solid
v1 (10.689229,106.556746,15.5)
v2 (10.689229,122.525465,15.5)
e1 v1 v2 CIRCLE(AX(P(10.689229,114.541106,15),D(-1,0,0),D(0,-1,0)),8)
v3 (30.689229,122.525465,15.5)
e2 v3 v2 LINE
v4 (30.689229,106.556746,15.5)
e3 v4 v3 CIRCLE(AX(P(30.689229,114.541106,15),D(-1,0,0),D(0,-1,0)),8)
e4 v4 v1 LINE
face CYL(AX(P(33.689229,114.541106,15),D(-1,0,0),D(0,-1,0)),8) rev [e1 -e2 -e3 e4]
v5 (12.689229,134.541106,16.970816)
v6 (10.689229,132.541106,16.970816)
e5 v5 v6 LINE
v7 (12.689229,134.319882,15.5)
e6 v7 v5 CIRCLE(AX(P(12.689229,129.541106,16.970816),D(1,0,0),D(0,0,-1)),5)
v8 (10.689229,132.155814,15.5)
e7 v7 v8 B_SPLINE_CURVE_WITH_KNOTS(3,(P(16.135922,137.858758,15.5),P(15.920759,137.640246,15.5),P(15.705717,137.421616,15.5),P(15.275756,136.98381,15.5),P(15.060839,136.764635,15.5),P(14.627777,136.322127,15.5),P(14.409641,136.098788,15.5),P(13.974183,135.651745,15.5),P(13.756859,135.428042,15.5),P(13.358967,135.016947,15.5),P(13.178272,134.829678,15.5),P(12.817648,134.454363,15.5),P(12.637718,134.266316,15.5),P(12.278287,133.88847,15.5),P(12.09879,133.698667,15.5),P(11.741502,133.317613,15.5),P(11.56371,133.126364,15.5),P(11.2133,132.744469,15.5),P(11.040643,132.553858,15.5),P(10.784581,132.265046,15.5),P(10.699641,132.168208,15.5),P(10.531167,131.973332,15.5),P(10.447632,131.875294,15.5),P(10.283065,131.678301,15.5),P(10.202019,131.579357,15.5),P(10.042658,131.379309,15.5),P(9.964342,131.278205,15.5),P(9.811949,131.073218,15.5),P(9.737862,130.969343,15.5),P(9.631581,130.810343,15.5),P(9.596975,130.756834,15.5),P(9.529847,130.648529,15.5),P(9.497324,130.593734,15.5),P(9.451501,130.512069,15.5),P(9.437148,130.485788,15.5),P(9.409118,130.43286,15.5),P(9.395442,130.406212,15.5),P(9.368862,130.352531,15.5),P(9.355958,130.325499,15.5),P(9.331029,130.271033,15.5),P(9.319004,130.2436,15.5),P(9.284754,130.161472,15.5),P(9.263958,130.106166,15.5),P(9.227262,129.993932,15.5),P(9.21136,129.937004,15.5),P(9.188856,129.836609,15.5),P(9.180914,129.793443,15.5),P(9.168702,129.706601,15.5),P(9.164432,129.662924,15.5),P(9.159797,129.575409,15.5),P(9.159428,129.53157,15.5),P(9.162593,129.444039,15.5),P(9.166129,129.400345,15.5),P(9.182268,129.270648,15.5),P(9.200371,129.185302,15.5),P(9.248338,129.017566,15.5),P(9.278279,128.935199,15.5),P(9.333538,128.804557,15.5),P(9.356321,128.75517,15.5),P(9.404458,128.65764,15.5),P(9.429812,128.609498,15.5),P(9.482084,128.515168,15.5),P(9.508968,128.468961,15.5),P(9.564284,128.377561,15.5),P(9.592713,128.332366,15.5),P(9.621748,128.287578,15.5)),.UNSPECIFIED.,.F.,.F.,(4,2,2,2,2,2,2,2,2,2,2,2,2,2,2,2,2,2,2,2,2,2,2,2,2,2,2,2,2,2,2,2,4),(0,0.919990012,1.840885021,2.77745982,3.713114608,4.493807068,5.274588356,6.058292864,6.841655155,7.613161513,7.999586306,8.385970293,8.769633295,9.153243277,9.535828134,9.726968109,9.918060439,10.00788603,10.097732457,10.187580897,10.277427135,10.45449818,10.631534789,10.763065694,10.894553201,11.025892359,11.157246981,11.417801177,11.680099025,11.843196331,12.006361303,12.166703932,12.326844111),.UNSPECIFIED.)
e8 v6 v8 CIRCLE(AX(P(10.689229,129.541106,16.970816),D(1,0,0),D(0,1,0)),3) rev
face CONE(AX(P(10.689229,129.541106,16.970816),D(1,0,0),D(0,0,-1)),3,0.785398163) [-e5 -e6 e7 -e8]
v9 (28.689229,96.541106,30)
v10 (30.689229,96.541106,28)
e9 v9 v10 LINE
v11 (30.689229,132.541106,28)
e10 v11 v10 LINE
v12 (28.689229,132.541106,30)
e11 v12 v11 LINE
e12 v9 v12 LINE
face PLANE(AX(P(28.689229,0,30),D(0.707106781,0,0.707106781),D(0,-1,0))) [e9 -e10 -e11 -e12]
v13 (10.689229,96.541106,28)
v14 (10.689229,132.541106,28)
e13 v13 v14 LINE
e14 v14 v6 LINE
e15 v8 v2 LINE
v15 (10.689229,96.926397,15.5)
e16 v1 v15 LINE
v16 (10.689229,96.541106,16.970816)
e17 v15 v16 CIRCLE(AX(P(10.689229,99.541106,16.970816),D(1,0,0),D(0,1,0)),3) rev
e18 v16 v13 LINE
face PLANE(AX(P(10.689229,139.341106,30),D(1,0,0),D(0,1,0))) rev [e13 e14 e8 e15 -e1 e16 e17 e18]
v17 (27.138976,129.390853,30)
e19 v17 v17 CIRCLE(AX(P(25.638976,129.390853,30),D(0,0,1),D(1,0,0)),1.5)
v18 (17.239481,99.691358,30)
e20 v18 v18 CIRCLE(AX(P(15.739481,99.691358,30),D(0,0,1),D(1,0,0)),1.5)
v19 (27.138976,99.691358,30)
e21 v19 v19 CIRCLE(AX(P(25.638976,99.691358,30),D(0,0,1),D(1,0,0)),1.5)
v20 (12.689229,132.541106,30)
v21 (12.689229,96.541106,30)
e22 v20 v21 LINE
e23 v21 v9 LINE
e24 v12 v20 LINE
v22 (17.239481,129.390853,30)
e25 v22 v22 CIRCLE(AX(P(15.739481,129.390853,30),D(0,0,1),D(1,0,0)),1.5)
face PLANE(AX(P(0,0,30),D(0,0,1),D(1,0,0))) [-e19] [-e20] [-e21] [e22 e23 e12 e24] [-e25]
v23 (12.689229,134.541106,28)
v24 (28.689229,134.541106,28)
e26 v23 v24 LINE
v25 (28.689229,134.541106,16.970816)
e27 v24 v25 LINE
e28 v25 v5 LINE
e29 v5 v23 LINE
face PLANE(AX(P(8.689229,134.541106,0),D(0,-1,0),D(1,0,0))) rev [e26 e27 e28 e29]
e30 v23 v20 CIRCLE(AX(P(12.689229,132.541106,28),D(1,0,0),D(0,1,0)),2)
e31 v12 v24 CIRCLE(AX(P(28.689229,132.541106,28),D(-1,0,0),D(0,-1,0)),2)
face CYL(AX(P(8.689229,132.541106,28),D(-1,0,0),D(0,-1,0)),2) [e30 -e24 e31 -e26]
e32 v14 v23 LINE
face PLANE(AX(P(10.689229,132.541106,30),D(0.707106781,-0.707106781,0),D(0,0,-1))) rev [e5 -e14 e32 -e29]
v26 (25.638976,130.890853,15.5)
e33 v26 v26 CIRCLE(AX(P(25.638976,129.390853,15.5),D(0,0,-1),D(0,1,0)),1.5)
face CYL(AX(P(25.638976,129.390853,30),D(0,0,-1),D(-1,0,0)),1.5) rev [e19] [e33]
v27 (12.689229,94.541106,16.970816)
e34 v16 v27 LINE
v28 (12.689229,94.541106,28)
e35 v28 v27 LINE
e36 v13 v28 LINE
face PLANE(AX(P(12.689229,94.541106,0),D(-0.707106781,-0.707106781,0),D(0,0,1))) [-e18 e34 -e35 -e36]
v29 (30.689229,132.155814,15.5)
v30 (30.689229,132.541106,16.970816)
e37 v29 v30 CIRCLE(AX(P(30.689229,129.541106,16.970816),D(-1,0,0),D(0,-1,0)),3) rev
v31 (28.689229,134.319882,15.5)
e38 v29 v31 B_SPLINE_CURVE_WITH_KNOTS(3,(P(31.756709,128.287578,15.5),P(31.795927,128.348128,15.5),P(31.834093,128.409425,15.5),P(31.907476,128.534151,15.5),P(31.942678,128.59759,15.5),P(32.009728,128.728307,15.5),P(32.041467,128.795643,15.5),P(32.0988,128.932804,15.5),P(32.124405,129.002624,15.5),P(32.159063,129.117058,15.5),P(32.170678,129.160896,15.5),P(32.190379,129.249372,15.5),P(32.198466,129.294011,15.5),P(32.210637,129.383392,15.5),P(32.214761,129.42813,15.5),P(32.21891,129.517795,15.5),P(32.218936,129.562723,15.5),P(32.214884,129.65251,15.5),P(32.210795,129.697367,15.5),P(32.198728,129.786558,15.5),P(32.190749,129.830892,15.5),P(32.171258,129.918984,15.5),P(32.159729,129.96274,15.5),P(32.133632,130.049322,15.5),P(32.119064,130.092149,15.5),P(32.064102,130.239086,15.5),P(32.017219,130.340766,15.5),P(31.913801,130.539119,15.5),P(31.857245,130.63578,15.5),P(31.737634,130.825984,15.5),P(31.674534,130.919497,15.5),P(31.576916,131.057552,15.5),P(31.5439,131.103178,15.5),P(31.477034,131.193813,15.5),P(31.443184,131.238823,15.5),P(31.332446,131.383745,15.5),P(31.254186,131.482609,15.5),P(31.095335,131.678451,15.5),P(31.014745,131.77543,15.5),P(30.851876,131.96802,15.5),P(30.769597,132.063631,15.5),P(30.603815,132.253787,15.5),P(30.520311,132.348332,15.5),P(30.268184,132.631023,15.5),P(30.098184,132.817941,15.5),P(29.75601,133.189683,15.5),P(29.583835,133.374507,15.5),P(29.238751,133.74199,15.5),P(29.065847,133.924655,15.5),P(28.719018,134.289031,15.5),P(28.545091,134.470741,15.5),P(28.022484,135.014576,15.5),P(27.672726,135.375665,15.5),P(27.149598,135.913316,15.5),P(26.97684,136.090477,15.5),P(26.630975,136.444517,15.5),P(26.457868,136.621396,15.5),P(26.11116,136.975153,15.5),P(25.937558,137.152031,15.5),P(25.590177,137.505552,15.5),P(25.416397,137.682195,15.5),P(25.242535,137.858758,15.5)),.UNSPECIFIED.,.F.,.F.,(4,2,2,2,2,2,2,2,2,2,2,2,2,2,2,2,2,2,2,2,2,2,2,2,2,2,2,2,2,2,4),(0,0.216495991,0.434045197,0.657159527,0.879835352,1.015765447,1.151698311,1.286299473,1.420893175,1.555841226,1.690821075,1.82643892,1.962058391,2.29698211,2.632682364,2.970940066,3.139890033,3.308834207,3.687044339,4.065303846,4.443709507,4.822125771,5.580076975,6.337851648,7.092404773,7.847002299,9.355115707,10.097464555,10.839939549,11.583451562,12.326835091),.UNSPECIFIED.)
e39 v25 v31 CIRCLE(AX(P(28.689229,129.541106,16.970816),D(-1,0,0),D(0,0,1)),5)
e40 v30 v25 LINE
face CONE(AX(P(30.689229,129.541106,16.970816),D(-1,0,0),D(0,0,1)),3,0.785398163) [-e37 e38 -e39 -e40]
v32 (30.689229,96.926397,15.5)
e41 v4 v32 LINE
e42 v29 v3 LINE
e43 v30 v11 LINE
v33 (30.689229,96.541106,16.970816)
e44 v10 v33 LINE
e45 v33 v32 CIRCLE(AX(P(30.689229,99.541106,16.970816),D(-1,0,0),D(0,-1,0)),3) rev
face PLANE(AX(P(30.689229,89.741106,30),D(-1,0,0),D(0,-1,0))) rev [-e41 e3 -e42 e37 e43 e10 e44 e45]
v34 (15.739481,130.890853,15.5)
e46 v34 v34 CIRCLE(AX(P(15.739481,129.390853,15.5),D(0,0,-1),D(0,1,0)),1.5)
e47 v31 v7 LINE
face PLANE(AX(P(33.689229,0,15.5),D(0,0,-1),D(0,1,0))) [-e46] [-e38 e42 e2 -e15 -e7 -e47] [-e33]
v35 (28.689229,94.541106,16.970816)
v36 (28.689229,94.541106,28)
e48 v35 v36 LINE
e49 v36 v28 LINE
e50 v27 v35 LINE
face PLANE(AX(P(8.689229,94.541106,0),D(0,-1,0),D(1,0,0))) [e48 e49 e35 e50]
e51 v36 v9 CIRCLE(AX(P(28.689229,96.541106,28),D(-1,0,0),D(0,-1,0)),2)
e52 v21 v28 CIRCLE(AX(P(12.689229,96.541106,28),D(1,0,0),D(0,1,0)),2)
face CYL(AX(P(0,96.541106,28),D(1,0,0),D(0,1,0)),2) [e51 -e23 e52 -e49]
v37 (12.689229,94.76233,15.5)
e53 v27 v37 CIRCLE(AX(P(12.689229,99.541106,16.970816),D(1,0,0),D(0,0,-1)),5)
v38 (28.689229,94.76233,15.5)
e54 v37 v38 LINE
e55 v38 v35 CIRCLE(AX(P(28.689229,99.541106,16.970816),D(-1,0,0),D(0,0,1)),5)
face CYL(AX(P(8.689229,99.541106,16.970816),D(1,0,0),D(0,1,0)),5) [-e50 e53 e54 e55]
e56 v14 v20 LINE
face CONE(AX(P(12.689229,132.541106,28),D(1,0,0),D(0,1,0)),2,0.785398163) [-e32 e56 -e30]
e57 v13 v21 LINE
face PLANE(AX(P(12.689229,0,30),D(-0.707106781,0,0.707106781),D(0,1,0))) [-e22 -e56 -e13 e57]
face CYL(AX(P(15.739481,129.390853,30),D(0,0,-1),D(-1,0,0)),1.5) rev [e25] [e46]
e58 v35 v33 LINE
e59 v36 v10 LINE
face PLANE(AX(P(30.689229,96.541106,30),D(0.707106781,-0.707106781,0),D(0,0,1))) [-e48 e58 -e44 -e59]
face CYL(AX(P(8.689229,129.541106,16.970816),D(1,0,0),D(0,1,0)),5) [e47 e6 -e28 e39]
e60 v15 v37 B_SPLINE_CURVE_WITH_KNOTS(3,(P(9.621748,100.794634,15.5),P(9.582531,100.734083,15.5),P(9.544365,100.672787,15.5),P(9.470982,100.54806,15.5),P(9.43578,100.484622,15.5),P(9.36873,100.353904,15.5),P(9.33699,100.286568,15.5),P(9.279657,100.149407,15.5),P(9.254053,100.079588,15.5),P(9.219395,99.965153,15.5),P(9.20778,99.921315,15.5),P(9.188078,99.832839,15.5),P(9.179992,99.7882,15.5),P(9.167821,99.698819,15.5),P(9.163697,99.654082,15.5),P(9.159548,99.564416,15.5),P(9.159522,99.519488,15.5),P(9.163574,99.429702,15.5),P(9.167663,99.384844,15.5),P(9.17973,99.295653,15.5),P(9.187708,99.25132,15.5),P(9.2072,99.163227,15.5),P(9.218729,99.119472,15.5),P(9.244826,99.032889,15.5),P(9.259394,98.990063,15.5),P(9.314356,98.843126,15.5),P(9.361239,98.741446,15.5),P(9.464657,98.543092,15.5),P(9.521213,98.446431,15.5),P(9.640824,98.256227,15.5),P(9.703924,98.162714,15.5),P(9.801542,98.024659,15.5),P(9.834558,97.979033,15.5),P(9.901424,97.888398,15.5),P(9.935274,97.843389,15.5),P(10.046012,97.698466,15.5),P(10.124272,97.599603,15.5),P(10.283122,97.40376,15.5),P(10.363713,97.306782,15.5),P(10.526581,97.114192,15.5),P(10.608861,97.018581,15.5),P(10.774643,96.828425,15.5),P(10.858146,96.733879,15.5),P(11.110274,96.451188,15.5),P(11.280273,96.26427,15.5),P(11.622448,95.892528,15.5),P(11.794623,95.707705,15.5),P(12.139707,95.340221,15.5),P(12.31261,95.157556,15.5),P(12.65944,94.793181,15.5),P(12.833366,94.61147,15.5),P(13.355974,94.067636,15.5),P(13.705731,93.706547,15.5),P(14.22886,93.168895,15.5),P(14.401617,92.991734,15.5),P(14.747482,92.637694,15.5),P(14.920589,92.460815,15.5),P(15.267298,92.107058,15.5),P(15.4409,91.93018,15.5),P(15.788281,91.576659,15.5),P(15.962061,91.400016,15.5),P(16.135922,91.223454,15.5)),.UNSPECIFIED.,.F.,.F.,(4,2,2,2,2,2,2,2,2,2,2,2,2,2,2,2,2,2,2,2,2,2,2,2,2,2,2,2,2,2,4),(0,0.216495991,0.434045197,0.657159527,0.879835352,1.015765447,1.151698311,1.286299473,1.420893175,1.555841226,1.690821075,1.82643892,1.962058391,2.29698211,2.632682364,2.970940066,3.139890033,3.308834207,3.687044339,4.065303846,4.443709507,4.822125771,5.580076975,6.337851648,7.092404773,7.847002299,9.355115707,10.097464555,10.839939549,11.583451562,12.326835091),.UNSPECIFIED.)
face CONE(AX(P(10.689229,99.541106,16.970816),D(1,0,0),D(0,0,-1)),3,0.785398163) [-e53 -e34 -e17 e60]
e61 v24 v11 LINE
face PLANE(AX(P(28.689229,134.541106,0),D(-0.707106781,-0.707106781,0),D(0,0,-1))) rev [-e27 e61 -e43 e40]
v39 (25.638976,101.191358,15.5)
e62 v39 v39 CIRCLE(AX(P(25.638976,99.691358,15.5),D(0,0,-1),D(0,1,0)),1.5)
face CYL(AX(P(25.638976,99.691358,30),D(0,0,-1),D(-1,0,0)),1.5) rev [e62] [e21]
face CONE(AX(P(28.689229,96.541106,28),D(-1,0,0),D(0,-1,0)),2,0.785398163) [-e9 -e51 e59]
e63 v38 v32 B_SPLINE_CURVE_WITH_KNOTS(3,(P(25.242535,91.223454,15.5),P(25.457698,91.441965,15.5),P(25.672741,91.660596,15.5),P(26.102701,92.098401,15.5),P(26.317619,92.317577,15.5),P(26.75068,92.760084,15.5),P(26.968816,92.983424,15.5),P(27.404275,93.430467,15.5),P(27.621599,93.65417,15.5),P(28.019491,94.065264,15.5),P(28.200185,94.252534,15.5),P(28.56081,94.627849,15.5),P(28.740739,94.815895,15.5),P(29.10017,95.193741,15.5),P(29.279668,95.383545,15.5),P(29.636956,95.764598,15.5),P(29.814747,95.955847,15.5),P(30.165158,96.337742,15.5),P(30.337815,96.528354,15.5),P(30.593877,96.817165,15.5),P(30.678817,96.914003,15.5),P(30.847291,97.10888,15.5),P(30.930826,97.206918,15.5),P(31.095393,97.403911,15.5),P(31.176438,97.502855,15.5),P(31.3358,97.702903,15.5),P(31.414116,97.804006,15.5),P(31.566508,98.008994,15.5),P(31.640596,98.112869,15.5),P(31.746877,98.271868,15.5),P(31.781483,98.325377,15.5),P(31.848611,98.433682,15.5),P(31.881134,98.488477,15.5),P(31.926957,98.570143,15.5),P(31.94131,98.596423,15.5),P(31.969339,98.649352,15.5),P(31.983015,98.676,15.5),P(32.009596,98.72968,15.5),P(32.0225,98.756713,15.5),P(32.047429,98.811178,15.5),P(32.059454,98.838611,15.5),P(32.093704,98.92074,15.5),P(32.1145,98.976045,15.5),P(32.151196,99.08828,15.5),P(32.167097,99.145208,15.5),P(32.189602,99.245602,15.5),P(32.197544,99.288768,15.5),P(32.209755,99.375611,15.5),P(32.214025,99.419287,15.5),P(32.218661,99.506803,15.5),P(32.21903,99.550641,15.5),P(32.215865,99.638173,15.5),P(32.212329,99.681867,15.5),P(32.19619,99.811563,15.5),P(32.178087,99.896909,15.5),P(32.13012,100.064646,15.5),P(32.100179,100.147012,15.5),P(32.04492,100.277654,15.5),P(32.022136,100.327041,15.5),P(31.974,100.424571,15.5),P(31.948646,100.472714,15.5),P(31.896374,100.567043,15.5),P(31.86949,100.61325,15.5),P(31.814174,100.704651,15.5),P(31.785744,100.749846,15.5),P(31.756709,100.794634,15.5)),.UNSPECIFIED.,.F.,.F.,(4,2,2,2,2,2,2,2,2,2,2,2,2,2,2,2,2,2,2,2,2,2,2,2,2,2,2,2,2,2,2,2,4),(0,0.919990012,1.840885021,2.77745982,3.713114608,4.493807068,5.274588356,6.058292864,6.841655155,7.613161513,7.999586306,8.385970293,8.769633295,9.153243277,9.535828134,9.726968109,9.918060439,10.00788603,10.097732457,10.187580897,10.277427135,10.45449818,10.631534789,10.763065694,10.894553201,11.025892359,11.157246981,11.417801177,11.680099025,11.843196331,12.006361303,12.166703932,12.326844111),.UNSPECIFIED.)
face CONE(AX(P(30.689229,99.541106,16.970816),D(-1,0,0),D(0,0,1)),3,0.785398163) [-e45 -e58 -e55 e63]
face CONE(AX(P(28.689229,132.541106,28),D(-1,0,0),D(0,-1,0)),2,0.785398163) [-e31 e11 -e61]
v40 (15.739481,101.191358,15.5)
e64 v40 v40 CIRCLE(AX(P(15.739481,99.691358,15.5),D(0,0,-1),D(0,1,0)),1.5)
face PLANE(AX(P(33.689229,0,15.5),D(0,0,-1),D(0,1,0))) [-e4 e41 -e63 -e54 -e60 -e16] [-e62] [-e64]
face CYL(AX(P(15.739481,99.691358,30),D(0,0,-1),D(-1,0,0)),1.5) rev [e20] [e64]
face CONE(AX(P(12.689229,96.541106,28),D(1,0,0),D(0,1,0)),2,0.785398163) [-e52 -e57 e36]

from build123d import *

# Parameters (mm, degrees)
SKETCH2_W           = 20
SKETCH2_H           = 49.6
SKETCH2_R           = 1.5
BOSS_EXTRUDE1_DEPTH = 30
CUT_EXTRUDE1_DEPTH  = 30
CUT_EXTRUDE2_DEPTH  = 22
FILLET1_R           = 5
FILLET2_R           = 2
CHAMFER1_SIZE       = 2
SKETCH5_R           = 3
SKETCH5_R_2         = 1.5
CUT_EXTRUDE3_DEPTH  = 12
CUT_EXTRUDE4_DEPTH  = 23


with BuildPart() as part:
    # Sketch2 → Boss-Extrude1 (new body)
    with BuildSketch(Plane.XY):
        with Locations((20.689228864, 114.541105708)):
            Rectangle(SKETCH2_W, SKETCH2_H)
        with Locations((15.739481395, 99.69135824)):
            Circle(SKETCH2_R, mode=Mode.SUBTRACT)
        with Locations((25.638976332, 99.69135824)):
            Circle(SKETCH2_R, mode=Mode.SUBTRACT)
        with Locations((25.638976332, 129.390853177)):
            Circle(SKETCH2_R, mode=Mode.SUBTRACT)
        with Locations((15.739481395, 129.390853177)):
            Circle(SKETCH2_R, mode=Mode.SUBTRACT)
    extrude(amount=BOSS_EXTRUDE1_DEPTH)

    # Sketch3 → Cut-Extrude1 (cut)
    with BuildSketch(Plane(origin=(30.689228864, 0, 0), x_dir=(0, 0, -1), z_dir=(1, 0, 0))):
        Polygon((-10, 119.541105708), (-18.024193548, 119.541105708), (-11.975806452, 109.541105708), (-10, 109.541105708), align=None)
        Polygon((-11.975806452, 109.541105708), (-18.024193548, 119.541105708), (-20, 119.541105708), (-20, 109.541105708), align=None)
    extrude(amount=-CUT_EXTRUDE1_DEPTH, mode=Mode.SUBTRACT)

    # Sketch4 → Cut-Extrude2 (cut)
    with BuildSketch(Plane(origin=(30.689228864, 0, 0), x_dir=(0, 0, -1), z_dir=(1, 0, 0))):
        Polygon((-30, 139.341105708), (-27.096774194, 134.541105708), (-15, 134.541105708), (0, 134.541105708), (0, 139.341105708), align=None)
        Polygon((-30, 134.541105708), (-27.096774194, 134.541105708), (-30, 139.341105708), align=None)
        Polygon((-15, 134.541105708), (0, 120.541105708), (0, 134.541105708), align=None)
        Polygon((-7.268041237, 101.757600554), (-2.903225806, 94.541105708), (0, 94.541105708), (0, 108.541105708), align=None)
        Polygon((-15, 94.541105708), (-2.903225806, 94.541105708), (-7.268041237, 101.757600554), align=None)
        Polygon((-30, 89.741105708), (0, 89.741105708), (-2.903225806, 94.541105708), (-15, 94.541105708), (-30, 94.541105708), align=None)
        Polygon((-2.903225806, 94.541105708), (0, 89.741105708), (0, 94.541105708), align=None)
    extrude(amount=-CUT_EXTRUDE2_DEPTH, mode=Mode.SUBTRACT)

    # Fillet1
    fillet1_edges = [part.edges().sort_by_distance(p)[0] for p in [
        (20.689228864, 134.541105708, 15),
        (20.689228864, 120.541105708, 0),
        (20.689228864, 94.541105708, 15),
        (20.689228864, 108.541105708, 0),
    ]]
    fillet(fillet1_edges, radius=FILLET1_R)

    # Fillet2
    fillet2_edges = [part.edges().sort_by_distance(p)[0] for p in [
        (20.689228864, 134.541105708, 30),
        (20.689228864, 94.541105708, 30),
    ]]
    fillet(fillet2_edges, radius=FILLET2_R)

    # Chamfer1
    chamfer1_edges = [part.edges().sort_by_distance(p)[0] for p in [
        (30.689228864, 127.610001295, 7.5738167),
        (10.689228864, 127.610001295, 7.5738167),
        (30.689228864, 114.541105708, 0),
        (30.689228864, 101.472210122, 7.5738167),
        (30.689228864, 108.721124919, 0.414263622),
        (30.689228864, 120.361086498, 0.414263622),
        (30.689228864, 94.889418826, 15.137292206),
        (30.689228864, 134.192792591, 15.137292206),
        (10.689228864, 114.541105708, 0),
        (10.689228864, 101.472210122, 7.5738167),
        (10.689228864, 108.721124919, 0.414263622),
        (10.689228864, 120.361086498, 0.414263622),
        (10.689228864, 94.889418826, 15.137292206),
        (10.689228864, 134.192792591, 15.137292206),
        (10.689228864, 114.541105708, 30),
        (30.689228864, 114.541105708, 30),
        (30.689228864, 134.541105708, 22.485407952),
        (30.689228864, 94.541105708, 22.485407952),
        (30.689228864, 133.955319271, 29.414213562),
        (30.689228864, 95.126892146, 29.414213562),
        (10.689228864, 94.541105708, 22.485407952),
        (10.689228864, 134.541105708, 22.485407952),
        (10.689228864, 133.955319271, 29.414213562),
        (10.689228864, 95.126892146, 29.414213562),
    ]]
    chamfer(chamfer1_edges, length=CHAMFER1_SIZE - 0.0001)  # a hair under: the kernel refuses the full size

    # Sketch5 → Cut-Extrude3 (cut)
    # profile 1 of 4: a face of its own
    with BuildSketch(Plane(origin=(0, 0, 0), x_dir=(-1, 0, 0), z_dir=(0, 0, -1))):
        with Locations((-15.739481395, 99.69135824)):
            Circle(SKETCH5_R)
        with Locations((-15.739481395, 99.69135824)):
            Circle(SKETCH5_R_2, mode=Mode.SUBTRACT)
    # profile 2 of 4: a face of its own
    with BuildSketch(Plane(origin=(0, 0, 0), x_dir=(-1, 0, 0), z_dir=(0, 0, -1))):
        with Locations((-25.638976332, 99.69135824)):
            Circle(SKETCH5_R)
        with Locations((-25.638976332, 99.69135824)):
            Circle(SKETCH5_R_2, mode=Mode.SUBTRACT)
    # profile 3 of 4: a face of its own
    with BuildSketch(Plane(origin=(0, 0, 0), x_dir=(-1, 0, 0), z_dir=(0, 0, -1))):
        with Locations((-15.739481395, 129.390853177)):
            Circle(SKETCH5_R)
        with Locations((-15.739481395, 129.390853177)):
            Circle(SKETCH5_R_2, mode=Mode.SUBTRACT)
    # profile 4 of 4: a face of its own
    with BuildSketch(Plane(origin=(0, 0, 0), x_dir=(-1, 0, 0), z_dir=(0, 0, -1))):
        with Locations((-25.638976332, 129.390853177)):
            Circle(SKETCH5_R)
        with Locations((-25.638976332, 129.390853177)):
            Circle(SKETCH5_R_2, mode=Mode.SUBTRACT)
    extrude(amount=-CUT_EXTRUDE3_DEPTH, mode=Mode.SUBTRACT)

    # Sketch6 → Cut-Extrude4 (cut)
    with BuildSketch(Plane.ZY.offset(-10.689228864)):
        with BuildLine():
            Line((15, 91.202832585), (15, 97.279273558))
            ThreePointArc((15, 97.279273558), (14.961637209, 97.313281439), (14.923861152, 97.347939904))
            Line((14.923861152, 97.347939904), (2.953045249, 108.520701413))
            ThreePointArc((2.953045249, 108.520701413), (2.248558173, 109.518221838), (2, 110.713867218))
            Line((2, 110.713867218), (2, 118.368344199))
            ThreePointArc((2, 118.368344199), (2.248558173, 119.563989578), (2.953045249, 120.561510003))
            Line((2.953045249, 120.561510003), (14.923861152, 131.734271513))
            ThreePointArc((14.923861152, 131.734271513), (14.961637209, 131.768929978), (15, 131.802937859))
            Line((15, 131.802937859), (15, 137.879378832))
            Line((15, 137.879378832), (-6.953674883, 137.879378832))
            Line((-6.953674883, 137.879378832), (-6.953674883, 91.202832585))
            Line((-6.953674883, 91.202832585), (15, 91.202832585))
        make_face()
        with BuildLine():
            Line((15, 122.541105708), (15, 119.541105708))
            Line((15, 119.541105708), (15.5, 119.541105708))
            Line((15.5, 119.541105708), (15.5, 122.52546542))
            ThreePointArc((15.5, 122.52546542), (15.250122279, 122.53719468), (15, 122.541105708))
        make_face()
        with BuildLine():
            Line((20, 109.541105708), (15.5, 109.541105708))
            Line((15.5, 109.541105708), (15.5, 106.556745997))
            ThreePointArc((15.5, 106.556745997), (20.830951895, 109.063880133), (23, 114.541105708))
            ThreePointArc((23, 114.541105708), (20.830951895, 120.018331283), (15.5, 122.52546542))
            Line((15.5, 122.52546542), (15.5, 119.541105708))
            Line((15.5, 119.541105708), (20, 119.541105708))
            Line((20, 119.541105708), (20, 109.541105708))
        make_face()
        with BuildLine():
            Line((15, 109.541105708), (10, 109.541105708))
            Line((10, 109.541105708), (10, 119.541105708))
            Line((10, 119.541105708), (15, 119.541105708))
            Line((15, 119.541105708), (15, 122.541105708))
            ThreePointArc((15, 122.541105708), (7, 114.541105708), (15, 106.541105708))
            Line((15, 106.541105708), (15, 109.541105708))
        make_face()
        Polygon((10, 119.541105708), (10, 109.541105708), (15, 114.541105708), (15, 119.541105708), align=None)
        Polygon((15, 119.541105708), (15, 114.541105708), (15.5, 115.041105708), (15.5, 119.541105708), align=None)
        Polygon((15.5, 119.541105708), (15.5, 115.041105708), (20, 119.541105708), align=None)
        Polygon((20, 119.541105708), (15.5, 115.041105708), (15.5, 109.541105708), (20, 109.541105708), align=None)
        Polygon((15.5, 115.041105708), (15, 114.541105708), (15, 109.541105708), (15.5, 109.541105708), align=None)
        Polygon((15, 114.541105708), (10, 109.541105708), (15, 109.541105708), align=None)
        with BuildLine():
            Line((15.5, 109.541105708), (15, 109.541105708))
            Line((15, 109.541105708), (15, 106.541105708))
            ThreePointArc((15, 106.541105708), (15.250122279, 106.545016736), (15.5, 106.556745997))
            Line((15.5, 106.556745997), (15.5, 109.541105708))
        make_face()
        with BuildLine():
            Line((15, 131.802937859), (15, 122.541105708))
            ThreePointArc((15, 122.541105708), (15.250122279, 122.53719468), (15.5, 122.52546542))
            Line((15.5, 122.52546542), (15.5, 132.155814216))
            ThreePointArc((15.5, 132.155814216), (15.240978395, 131.992158991), (15, 131.802937859))
        make_face()
        with BuildLine():
            ThreePointArc((15.5, 96.926397201), (15.240978395, 97.090052425), (15, 97.279273558))
            Line((15, 97.279273558), (15, 91.202832585))
            Line((15, 91.202832585), (15.5, 91.202832585))
            Line((15.5, 91.202832585), (15.5, 96.926397201))
        make_face()
        with BuildLine():
            ThreePointArc((15.5, 106.556745997), (15.250122279, 106.545016736), (15, 106.541105708))
            Line((15, 106.541105708), (15, 97.279273558))
            ThreePointArc((15, 97.279273558), (15.240978395, 97.090052425), (15.5, 96.926397201))
            Line((15.5, 96.926397201), (15.5, 106.556745997))
        make_face()
        with BuildLine():
            Line((15, 97.279273558), (15, 106.541105708))
            ThreePointArc((15, 106.541105708), (7, 114.541105708), (15, 122.541105708))
            Line((15, 122.541105708), (15, 131.802937859))
            ThreePointArc((15, 131.802937859), (14.961637209, 131.768929978), (14.923861152, 131.734271513))
            Line((14.923861152, 131.734271513), (2.953045249, 120.561510003))
            ThreePointArc((2.953045249, 120.561510003), (2.248558173, 119.563989578), (2, 118.368344199))
            Line((2, 118.368344199), (2, 110.713867218))
            ThreePointArc((2, 110.713867218), (2.248558173, 109.518221838), (2.953045249, 108.520701413))
            Line((2.953045249, 108.520701413), (14.923861152, 97.347939904))
            ThreePointArc((14.923861152, 97.347939904), (14.961637209, 97.313281439), (15, 97.279273558))
        make_face()
        with BuildLine():
            Line((15, 137.879378832), (15, 131.802937859))
            ThreePointArc((15, 131.802937859), (15.240978395, 131.992158991), (15.5, 132.155814216))
            Line((15.5, 132.155814216), (15.5, 137.879378832))
            Line((15.5, 137.879378832), (15, 137.879378832))
        make_face()
    extrude(amount=-CUT_EXTRUDE4_DEPTH, mode=Mode.SUBTRACT)


solid = part.part
